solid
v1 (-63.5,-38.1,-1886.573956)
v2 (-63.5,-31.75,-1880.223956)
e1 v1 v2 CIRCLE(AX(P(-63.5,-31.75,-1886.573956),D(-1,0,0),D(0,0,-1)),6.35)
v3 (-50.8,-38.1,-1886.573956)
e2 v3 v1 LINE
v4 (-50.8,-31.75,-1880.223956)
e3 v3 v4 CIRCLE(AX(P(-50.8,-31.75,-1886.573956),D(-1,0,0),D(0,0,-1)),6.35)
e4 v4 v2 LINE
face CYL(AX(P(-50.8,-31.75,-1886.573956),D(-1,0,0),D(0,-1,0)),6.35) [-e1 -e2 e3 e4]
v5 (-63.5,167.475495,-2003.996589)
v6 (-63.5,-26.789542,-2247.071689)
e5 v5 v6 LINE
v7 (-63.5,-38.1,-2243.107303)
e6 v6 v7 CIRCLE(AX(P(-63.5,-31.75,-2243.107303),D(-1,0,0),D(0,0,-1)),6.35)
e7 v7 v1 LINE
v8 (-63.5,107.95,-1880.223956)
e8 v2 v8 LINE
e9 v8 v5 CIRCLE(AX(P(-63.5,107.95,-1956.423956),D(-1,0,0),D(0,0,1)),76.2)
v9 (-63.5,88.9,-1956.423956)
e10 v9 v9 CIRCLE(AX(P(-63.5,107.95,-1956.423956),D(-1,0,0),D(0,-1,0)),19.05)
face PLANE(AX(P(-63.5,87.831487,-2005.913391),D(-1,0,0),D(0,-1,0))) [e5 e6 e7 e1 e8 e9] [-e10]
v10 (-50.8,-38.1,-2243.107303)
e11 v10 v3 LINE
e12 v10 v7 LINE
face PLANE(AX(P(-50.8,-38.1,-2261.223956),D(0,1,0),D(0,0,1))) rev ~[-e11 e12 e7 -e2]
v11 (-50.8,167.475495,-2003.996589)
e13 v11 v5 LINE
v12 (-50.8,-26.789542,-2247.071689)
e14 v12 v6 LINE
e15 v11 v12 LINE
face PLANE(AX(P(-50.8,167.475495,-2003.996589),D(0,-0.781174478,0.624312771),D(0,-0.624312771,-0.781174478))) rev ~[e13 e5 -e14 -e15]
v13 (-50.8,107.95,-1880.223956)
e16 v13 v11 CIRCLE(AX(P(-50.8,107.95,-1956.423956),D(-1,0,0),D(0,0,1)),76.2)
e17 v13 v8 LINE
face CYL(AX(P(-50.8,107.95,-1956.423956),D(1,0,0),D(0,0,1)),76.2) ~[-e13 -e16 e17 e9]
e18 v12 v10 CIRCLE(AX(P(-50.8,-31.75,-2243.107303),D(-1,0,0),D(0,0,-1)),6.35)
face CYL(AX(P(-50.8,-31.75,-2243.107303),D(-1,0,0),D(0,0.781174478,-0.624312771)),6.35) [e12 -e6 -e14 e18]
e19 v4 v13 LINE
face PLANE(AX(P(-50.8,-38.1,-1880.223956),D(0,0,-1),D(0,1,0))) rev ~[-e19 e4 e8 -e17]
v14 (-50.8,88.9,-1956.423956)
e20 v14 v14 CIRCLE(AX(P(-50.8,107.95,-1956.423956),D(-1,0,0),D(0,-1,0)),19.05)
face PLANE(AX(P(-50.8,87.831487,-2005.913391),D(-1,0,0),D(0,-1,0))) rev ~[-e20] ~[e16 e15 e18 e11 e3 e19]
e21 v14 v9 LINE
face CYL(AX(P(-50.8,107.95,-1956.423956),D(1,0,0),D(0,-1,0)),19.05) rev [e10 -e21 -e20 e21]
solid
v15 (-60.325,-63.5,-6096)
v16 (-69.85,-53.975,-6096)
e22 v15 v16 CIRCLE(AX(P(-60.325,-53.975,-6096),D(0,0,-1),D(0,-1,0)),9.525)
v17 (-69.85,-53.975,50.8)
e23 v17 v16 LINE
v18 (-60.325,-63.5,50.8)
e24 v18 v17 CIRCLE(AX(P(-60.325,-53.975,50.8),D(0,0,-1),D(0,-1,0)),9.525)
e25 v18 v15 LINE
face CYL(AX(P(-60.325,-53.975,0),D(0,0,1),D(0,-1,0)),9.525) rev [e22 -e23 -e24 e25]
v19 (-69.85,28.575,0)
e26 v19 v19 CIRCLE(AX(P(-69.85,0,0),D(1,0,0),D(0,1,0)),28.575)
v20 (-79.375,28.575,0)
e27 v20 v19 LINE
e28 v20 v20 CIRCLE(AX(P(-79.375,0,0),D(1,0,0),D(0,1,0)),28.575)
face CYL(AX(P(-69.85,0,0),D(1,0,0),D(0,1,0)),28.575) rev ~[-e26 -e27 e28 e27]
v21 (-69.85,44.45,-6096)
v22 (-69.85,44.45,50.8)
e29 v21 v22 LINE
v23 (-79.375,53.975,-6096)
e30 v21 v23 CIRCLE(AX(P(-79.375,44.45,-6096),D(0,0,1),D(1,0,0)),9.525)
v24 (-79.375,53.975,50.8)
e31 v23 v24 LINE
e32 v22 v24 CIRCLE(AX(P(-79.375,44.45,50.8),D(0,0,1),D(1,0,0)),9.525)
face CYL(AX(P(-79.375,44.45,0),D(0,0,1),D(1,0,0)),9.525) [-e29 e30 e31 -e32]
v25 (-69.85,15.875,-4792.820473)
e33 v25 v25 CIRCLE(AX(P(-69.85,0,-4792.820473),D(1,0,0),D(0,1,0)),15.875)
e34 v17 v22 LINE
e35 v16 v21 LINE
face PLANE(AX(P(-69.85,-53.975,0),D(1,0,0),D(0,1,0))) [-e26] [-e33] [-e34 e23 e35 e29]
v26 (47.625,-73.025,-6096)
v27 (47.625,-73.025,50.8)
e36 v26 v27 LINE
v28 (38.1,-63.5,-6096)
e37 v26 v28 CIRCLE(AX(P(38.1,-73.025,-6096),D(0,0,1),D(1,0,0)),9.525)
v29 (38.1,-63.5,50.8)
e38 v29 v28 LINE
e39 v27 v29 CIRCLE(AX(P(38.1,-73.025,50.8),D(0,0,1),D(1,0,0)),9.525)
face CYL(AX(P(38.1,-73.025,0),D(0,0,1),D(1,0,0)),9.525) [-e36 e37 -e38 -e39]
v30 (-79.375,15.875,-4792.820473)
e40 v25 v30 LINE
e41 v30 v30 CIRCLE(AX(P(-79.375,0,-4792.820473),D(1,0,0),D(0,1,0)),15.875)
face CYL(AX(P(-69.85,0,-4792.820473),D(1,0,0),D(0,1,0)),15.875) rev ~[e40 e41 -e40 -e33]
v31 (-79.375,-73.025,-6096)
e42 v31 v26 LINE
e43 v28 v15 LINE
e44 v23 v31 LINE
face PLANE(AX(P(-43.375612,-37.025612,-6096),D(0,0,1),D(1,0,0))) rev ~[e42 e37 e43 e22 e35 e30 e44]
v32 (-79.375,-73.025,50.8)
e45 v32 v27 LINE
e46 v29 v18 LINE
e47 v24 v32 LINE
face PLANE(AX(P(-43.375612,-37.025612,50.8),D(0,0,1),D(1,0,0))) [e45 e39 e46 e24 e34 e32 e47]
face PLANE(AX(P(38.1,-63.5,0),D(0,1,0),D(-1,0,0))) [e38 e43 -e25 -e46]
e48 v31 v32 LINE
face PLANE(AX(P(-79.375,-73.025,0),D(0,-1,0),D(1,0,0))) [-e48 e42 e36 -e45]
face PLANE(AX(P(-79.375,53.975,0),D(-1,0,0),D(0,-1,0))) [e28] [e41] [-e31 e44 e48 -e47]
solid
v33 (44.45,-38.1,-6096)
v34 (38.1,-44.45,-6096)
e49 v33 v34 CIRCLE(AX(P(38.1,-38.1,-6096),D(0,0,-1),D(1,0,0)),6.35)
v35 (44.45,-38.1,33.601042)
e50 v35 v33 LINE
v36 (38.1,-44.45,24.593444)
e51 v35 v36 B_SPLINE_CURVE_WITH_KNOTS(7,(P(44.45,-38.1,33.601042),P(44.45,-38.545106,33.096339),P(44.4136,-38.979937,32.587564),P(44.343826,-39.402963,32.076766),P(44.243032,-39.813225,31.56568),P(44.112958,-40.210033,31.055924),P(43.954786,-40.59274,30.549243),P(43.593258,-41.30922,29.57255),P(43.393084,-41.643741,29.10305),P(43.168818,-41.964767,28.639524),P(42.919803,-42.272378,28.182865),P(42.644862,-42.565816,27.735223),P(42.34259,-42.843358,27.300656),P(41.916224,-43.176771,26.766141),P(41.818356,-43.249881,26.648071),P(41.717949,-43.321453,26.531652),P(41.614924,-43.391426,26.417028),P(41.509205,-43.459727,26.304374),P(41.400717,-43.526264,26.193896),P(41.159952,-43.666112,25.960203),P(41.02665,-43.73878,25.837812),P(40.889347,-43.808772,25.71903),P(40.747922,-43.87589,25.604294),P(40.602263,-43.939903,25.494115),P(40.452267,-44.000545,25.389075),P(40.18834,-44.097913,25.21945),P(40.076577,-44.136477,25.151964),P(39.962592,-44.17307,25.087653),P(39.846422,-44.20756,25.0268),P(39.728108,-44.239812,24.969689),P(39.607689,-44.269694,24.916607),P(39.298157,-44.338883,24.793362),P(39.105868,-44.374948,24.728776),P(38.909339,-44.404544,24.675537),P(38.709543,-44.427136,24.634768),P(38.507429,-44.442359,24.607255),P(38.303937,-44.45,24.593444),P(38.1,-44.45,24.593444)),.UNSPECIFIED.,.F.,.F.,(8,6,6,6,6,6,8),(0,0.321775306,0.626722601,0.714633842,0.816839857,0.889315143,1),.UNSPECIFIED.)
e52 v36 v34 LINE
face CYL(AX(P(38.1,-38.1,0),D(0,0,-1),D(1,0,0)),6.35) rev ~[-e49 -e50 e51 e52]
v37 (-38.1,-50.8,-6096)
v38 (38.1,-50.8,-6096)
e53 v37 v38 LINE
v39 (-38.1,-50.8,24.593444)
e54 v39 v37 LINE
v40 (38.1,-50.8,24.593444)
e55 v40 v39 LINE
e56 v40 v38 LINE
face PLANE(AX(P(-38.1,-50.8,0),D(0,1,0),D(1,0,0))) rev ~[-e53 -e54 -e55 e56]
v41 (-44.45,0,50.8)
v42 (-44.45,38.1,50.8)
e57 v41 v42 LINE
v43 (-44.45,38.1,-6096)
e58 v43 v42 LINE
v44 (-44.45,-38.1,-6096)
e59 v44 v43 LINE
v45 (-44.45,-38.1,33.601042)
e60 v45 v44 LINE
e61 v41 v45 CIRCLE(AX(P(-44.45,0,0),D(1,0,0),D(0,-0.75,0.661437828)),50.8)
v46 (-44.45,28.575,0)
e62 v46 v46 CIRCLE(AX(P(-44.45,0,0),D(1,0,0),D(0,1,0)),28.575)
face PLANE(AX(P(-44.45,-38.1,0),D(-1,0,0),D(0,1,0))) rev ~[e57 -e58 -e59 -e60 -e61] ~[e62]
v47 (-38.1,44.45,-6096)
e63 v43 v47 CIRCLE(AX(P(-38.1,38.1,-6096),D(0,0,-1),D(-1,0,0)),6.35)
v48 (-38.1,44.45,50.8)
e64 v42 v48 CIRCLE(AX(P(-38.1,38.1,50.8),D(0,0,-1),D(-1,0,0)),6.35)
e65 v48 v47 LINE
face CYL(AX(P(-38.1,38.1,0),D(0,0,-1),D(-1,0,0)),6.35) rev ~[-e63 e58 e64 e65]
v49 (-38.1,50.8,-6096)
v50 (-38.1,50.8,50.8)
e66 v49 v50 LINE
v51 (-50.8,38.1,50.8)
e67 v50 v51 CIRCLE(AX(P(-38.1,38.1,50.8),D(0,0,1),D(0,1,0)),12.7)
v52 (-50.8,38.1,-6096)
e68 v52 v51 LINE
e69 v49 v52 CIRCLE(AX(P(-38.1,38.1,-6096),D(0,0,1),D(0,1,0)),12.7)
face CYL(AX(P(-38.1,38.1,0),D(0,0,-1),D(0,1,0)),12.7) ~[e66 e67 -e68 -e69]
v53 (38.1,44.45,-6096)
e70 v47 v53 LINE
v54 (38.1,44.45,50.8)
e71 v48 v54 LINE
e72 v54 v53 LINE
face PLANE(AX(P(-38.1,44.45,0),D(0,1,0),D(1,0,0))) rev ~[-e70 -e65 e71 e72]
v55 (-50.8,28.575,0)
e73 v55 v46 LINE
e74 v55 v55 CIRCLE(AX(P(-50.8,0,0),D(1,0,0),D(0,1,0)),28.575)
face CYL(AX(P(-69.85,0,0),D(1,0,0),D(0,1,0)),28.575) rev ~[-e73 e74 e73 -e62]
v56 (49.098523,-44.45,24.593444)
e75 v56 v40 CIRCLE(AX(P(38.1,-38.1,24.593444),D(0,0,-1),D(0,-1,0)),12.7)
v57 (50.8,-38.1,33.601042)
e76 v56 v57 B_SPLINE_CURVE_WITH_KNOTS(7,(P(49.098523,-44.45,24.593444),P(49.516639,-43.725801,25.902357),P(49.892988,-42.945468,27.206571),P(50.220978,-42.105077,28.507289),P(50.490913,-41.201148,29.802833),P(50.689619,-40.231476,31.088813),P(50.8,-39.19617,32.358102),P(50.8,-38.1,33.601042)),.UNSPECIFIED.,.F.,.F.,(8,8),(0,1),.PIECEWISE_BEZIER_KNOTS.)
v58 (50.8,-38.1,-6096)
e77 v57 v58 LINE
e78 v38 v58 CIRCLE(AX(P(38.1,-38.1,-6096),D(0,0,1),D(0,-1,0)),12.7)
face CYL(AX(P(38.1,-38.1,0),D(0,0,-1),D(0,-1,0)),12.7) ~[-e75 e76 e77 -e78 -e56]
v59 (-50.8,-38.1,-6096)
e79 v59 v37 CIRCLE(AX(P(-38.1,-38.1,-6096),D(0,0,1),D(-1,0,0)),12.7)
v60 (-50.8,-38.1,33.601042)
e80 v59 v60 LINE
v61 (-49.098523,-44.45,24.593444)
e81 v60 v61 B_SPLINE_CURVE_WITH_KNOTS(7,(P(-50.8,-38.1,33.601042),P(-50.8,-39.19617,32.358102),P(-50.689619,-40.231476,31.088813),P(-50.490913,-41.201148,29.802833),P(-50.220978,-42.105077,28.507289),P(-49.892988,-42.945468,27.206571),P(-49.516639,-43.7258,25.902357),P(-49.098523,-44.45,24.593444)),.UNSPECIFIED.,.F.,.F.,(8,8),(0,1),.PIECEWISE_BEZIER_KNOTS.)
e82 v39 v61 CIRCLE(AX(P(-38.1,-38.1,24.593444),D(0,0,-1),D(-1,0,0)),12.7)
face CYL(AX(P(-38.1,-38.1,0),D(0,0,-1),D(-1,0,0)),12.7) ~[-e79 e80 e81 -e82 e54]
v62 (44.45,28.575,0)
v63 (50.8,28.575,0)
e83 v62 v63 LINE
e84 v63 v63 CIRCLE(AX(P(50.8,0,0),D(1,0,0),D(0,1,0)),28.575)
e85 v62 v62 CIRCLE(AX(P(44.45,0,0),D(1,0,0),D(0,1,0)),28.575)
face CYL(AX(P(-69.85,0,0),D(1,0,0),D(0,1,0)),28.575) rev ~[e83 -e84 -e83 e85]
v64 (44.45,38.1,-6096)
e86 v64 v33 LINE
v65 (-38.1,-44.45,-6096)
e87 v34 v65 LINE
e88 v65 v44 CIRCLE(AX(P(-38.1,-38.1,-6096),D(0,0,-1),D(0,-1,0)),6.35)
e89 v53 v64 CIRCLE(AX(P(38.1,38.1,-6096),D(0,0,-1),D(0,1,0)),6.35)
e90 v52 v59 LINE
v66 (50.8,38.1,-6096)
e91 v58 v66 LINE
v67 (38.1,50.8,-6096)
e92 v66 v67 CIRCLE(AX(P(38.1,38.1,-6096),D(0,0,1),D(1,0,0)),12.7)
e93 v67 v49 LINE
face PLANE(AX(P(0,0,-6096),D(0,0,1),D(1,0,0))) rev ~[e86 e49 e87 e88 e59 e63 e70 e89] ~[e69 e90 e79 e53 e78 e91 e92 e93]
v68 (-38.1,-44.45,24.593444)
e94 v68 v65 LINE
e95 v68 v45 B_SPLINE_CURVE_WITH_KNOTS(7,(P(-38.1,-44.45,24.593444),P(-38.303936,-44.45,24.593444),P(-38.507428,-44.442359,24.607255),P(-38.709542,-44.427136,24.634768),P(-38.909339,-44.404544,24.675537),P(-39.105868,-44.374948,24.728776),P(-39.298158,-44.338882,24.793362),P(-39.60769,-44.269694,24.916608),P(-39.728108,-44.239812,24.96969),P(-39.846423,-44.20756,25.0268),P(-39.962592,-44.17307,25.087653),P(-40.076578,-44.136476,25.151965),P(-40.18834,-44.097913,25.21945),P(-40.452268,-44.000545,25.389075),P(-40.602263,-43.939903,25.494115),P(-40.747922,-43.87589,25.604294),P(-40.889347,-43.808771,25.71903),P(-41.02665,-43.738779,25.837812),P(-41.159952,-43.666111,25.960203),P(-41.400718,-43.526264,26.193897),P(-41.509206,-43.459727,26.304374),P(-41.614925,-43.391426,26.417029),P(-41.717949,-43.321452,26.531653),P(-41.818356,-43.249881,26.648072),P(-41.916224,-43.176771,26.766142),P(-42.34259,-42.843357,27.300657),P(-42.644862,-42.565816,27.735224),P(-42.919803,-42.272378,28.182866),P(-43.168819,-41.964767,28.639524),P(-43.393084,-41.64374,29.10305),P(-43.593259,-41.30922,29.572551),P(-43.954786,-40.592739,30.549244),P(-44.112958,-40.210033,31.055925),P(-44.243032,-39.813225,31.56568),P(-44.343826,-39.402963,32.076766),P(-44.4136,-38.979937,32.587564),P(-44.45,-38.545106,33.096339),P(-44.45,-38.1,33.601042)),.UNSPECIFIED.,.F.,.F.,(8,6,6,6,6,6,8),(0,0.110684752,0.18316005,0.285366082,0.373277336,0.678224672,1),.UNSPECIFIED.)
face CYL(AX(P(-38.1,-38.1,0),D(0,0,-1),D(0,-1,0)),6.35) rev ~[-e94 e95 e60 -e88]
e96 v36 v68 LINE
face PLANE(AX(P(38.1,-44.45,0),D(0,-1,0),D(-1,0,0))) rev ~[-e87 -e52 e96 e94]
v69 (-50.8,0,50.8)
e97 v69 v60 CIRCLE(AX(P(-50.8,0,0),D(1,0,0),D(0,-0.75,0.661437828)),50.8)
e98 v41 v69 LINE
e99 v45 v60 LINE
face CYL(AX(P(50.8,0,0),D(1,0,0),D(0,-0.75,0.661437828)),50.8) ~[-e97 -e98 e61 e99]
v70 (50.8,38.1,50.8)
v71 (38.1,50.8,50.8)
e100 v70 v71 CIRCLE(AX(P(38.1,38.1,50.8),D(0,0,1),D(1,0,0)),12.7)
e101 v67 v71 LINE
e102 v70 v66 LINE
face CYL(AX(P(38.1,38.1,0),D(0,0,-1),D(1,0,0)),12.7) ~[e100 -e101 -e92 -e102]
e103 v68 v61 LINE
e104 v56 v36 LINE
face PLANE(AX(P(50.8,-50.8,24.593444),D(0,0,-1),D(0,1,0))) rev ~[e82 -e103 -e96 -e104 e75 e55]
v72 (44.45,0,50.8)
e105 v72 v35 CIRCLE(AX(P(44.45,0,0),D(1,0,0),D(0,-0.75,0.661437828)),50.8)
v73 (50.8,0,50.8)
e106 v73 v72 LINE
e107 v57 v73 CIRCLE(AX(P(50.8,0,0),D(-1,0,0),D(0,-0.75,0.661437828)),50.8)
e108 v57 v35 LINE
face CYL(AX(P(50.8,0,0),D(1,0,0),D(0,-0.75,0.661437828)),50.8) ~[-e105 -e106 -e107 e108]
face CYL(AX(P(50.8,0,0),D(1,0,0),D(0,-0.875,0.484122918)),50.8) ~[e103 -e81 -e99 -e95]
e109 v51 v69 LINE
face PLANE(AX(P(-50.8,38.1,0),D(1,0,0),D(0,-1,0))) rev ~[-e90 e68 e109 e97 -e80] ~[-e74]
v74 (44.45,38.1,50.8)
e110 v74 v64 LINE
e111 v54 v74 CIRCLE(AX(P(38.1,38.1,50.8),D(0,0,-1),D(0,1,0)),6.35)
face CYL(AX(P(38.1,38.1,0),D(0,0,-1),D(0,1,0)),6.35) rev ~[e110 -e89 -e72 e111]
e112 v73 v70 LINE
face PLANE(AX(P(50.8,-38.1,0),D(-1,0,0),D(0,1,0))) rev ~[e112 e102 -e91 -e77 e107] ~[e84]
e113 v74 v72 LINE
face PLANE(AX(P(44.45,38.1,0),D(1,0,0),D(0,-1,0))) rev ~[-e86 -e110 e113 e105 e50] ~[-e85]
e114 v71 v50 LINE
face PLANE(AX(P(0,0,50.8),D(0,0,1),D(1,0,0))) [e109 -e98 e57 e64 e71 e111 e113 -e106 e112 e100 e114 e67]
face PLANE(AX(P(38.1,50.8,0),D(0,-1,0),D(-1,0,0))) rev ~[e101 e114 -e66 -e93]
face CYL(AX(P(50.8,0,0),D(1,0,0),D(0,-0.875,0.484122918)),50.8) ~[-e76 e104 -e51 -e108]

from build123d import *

# Parameters (mm, degrees)
F1_DEPTH      = 6096
F1_DEPTH_BACK = 50.8
F2_DEPTH      = 50.8
F2_DEPTH_BACK = 6096
F3_R          = 15.875
F4_DEPTH      = 9.526
F3_R_2        = 28.575
F3_R_3        = 19.05
F5_DEPTH      = 120.651
F5_DEPTH_BACK = 9.526
F7_R          = 19.05
F8_DEPTH      = 12.7
F9_R          = 6.35
F11_DEPTH     = 130.176


# Not quite as in the source:
# - the program builds the solid bodies; features that only make, move or delete a surface that nothing else refers to are left out


with BuildPart() as f1:
    # F12 (on Top) → F1 (new body, two sides)
    with BuildSketch(Plane.XY) as f1_sk:
        with BuildLine():
            ThreePointArc((50.8, 38.1), (47.0802561211, 47.0802561211), (38.1, 50.8))
            Line((38.1, 50.8), (-38.1, 50.8))
            ThreePointArc((-38.1, 50.8), (-47.0802561211, 47.0802561211), (-50.8, 38.1))
            Line((-50.8, 38.1), (-50.8, -38.1))
            ThreePointArc((-50.8, -38.1), (-47.0802561211, -47.0802561211), (-38.1, -50.8))
            Line((-38.1, -50.8), (38.1, -50.8))
            ThreePointArc((38.1, -50.8), (47.0802561211, -47.0802561211), (50.8, -38.1))
            Line((50.8, -38.1), (50.8, 38.1))
        make_face()
        with BuildLine():
            ThreePointArc((-44.45, 38.1), (-42.5901280605, 42.5901280605), (-38.1, 44.45))
            Line((-38.1, 44.45), (38.1, 44.45))
            ThreePointArc((38.1, 44.45), (42.5901280605, 42.5901280605), (44.45, 38.1))
            Line((44.45, 38.1), (44.45, -38.1))
            ThreePointArc((44.45, -38.1), (42.5901280605, -42.5901280605), (38.1, -44.45))
            Line((38.1, -44.45), (-38.1, -44.45))
            ThreePointArc((-38.1, -44.45), (-42.5901280605, -42.5901280605), (-44.45, -38.1))
            Line((-44.45, -38.1), (-44.45, 38.1))
        make_face(mode=Mode.SUBTRACT)
    extrude(amount=-F1_DEPTH)
    extrude(f1_sk.sketch, amount=F1_DEPTH_BACK)


with BuildPart() as f2:
    # F12 (on Top) → F2 (new body, two sides)
    with BuildSketch(Plane.XY) as f2_sk:
        with BuildLine():
            Line((-69.85, -53.975), (-69.85, 44.45))
            ThreePointArc((-69.85, 44.45), (-72.6398079092, 51.1851920908), (-79.375, 53.975))
            Line((-79.375, 53.975), (-79.375, -73.025))
            Line((-79.375, -73.025), (47.625, -73.025))
            ThreePointArc((47.625, -73.025), (44.8351920908, -66.2898079092), (38.1, -63.5))
            Line((38.1, -63.5), (-60.325, -63.5))
            ThreePointArc((-60.325, -63.5), (-67.0601920908, -60.7101920908), (-69.85, -53.975))
        make_face()
    extrude(amount=F2_DEPTH)
    extrude(f2_sk.sketch, amount=-F2_DEPTH_BACK)

    # F3 (on face) → F4 (cut, through all)
    with BuildSketch(Plane.YZ.offset(-69.85)):
        with Locations((0, -4792.820472761)):
            Circle(F3_R)
    extrude(amount=-F4_DEPTH, mode=Mode.SUBTRACT)


with BuildPart() as f5_tool:
    # F3 (on face) → F5 (new body, two sides)
    with BuildSketch(Plane.YZ.offset(-69.85)) as f5_sk:
        Circle(F3_R_2)
        Circle(F3_R_3, mode=Mode.SUBTRACT)
        Circle(F3_R_3)
    extrude(amount=F5_DEPTH)
    extrude(f5_sk.sketch, amount=-F5_DEPTH_BACK)


with BuildPart() as f1_1:
    add(f1.part)

    # F5: cut by f5_tool
    add(f5_tool.part, mode=Mode.SUBTRACT)

    # F10 (on face) → F11 (cut, through all)
    with BuildSketch(Plane.YZ.offset(50.8)):
        with BuildLine():
            Line((-38.1, 50.8), (-38.1, 33.6010416505))
            ThreePointArc((-38.1, 33.6010416505), (-20.9010416505, 46.3010416505), (0, 50.8))
            Line((0, 50.8), (-38.1, 50.8))
        make_face()
        with BuildLine():
            Line((-50.8, 24.5934442484), (-44.45, 24.5934442484))
            ThreePointArc((-44.45, 24.5934442484), (-41.5199931086, 29.2699534038), (-38.1, 33.6010416505))
            Line((-38.1, 33.6010416505), (-38.1, 50.8))
            Line((-38.1, 50.8), (-50.8, 50.8))
            Line((-50.8, 50.8), (-50.8, 24.5934442484))
        make_face()
    extrude(amount=-F11_DEPTH, mode=Mode.SUBTRACT)


with BuildPart() as f2_1:
    add(f2.part)

    # F5: cut by f5_tool
    add(f5_tool.part, mode=Mode.SUBTRACT)


with BuildPart() as f8:
    # F7 (on face) → F8 (new body)
    with BuildSketch(Plane(origin=(-50.8, 0, 0), x_dir=(0, -1, 0), z_dir=(-1, 0, 0))):
        with BuildLine():
            Line((-38.1, -2165.878324814), (-38.1, -1880.2239560519))
            Line((-38.1, -1880.2239560519), (-107.95, -1880.2239560519))
            ThreePointArc((-107.95, -1880.2239560519), (-176.6212263011, -1923.3981679718), (-167.4754951972, -2003.9965891672))
            Line((-167.4754951972, -2003.9965891672), (-38.1, -2165.878324814))
        make_face()
        with Locations((-107.95, -1956.4239560519)):
            Circle(F7_R, mode=Mode.SUBTRACT)
        Polygon((38.1, -2261.2239560519), (38.1, -1880.2239560519), (-38.1, -1880.2239560519), (-38.1, -2165.878324814), align=None)
    extrude(amount=F8_DEPTH)

    # F9
    f9_edges = [f8.edges().sort_by_distance(p)[0] for p in [
        (-57.15, -38.1, -1880.223956),
        (-57.15, -38.1, -2261.223956),
    ]]
    fillet(f9_edges, radius=F9_R)


solid = Compound([f1_1.part, f2_1.part, f8.part])
